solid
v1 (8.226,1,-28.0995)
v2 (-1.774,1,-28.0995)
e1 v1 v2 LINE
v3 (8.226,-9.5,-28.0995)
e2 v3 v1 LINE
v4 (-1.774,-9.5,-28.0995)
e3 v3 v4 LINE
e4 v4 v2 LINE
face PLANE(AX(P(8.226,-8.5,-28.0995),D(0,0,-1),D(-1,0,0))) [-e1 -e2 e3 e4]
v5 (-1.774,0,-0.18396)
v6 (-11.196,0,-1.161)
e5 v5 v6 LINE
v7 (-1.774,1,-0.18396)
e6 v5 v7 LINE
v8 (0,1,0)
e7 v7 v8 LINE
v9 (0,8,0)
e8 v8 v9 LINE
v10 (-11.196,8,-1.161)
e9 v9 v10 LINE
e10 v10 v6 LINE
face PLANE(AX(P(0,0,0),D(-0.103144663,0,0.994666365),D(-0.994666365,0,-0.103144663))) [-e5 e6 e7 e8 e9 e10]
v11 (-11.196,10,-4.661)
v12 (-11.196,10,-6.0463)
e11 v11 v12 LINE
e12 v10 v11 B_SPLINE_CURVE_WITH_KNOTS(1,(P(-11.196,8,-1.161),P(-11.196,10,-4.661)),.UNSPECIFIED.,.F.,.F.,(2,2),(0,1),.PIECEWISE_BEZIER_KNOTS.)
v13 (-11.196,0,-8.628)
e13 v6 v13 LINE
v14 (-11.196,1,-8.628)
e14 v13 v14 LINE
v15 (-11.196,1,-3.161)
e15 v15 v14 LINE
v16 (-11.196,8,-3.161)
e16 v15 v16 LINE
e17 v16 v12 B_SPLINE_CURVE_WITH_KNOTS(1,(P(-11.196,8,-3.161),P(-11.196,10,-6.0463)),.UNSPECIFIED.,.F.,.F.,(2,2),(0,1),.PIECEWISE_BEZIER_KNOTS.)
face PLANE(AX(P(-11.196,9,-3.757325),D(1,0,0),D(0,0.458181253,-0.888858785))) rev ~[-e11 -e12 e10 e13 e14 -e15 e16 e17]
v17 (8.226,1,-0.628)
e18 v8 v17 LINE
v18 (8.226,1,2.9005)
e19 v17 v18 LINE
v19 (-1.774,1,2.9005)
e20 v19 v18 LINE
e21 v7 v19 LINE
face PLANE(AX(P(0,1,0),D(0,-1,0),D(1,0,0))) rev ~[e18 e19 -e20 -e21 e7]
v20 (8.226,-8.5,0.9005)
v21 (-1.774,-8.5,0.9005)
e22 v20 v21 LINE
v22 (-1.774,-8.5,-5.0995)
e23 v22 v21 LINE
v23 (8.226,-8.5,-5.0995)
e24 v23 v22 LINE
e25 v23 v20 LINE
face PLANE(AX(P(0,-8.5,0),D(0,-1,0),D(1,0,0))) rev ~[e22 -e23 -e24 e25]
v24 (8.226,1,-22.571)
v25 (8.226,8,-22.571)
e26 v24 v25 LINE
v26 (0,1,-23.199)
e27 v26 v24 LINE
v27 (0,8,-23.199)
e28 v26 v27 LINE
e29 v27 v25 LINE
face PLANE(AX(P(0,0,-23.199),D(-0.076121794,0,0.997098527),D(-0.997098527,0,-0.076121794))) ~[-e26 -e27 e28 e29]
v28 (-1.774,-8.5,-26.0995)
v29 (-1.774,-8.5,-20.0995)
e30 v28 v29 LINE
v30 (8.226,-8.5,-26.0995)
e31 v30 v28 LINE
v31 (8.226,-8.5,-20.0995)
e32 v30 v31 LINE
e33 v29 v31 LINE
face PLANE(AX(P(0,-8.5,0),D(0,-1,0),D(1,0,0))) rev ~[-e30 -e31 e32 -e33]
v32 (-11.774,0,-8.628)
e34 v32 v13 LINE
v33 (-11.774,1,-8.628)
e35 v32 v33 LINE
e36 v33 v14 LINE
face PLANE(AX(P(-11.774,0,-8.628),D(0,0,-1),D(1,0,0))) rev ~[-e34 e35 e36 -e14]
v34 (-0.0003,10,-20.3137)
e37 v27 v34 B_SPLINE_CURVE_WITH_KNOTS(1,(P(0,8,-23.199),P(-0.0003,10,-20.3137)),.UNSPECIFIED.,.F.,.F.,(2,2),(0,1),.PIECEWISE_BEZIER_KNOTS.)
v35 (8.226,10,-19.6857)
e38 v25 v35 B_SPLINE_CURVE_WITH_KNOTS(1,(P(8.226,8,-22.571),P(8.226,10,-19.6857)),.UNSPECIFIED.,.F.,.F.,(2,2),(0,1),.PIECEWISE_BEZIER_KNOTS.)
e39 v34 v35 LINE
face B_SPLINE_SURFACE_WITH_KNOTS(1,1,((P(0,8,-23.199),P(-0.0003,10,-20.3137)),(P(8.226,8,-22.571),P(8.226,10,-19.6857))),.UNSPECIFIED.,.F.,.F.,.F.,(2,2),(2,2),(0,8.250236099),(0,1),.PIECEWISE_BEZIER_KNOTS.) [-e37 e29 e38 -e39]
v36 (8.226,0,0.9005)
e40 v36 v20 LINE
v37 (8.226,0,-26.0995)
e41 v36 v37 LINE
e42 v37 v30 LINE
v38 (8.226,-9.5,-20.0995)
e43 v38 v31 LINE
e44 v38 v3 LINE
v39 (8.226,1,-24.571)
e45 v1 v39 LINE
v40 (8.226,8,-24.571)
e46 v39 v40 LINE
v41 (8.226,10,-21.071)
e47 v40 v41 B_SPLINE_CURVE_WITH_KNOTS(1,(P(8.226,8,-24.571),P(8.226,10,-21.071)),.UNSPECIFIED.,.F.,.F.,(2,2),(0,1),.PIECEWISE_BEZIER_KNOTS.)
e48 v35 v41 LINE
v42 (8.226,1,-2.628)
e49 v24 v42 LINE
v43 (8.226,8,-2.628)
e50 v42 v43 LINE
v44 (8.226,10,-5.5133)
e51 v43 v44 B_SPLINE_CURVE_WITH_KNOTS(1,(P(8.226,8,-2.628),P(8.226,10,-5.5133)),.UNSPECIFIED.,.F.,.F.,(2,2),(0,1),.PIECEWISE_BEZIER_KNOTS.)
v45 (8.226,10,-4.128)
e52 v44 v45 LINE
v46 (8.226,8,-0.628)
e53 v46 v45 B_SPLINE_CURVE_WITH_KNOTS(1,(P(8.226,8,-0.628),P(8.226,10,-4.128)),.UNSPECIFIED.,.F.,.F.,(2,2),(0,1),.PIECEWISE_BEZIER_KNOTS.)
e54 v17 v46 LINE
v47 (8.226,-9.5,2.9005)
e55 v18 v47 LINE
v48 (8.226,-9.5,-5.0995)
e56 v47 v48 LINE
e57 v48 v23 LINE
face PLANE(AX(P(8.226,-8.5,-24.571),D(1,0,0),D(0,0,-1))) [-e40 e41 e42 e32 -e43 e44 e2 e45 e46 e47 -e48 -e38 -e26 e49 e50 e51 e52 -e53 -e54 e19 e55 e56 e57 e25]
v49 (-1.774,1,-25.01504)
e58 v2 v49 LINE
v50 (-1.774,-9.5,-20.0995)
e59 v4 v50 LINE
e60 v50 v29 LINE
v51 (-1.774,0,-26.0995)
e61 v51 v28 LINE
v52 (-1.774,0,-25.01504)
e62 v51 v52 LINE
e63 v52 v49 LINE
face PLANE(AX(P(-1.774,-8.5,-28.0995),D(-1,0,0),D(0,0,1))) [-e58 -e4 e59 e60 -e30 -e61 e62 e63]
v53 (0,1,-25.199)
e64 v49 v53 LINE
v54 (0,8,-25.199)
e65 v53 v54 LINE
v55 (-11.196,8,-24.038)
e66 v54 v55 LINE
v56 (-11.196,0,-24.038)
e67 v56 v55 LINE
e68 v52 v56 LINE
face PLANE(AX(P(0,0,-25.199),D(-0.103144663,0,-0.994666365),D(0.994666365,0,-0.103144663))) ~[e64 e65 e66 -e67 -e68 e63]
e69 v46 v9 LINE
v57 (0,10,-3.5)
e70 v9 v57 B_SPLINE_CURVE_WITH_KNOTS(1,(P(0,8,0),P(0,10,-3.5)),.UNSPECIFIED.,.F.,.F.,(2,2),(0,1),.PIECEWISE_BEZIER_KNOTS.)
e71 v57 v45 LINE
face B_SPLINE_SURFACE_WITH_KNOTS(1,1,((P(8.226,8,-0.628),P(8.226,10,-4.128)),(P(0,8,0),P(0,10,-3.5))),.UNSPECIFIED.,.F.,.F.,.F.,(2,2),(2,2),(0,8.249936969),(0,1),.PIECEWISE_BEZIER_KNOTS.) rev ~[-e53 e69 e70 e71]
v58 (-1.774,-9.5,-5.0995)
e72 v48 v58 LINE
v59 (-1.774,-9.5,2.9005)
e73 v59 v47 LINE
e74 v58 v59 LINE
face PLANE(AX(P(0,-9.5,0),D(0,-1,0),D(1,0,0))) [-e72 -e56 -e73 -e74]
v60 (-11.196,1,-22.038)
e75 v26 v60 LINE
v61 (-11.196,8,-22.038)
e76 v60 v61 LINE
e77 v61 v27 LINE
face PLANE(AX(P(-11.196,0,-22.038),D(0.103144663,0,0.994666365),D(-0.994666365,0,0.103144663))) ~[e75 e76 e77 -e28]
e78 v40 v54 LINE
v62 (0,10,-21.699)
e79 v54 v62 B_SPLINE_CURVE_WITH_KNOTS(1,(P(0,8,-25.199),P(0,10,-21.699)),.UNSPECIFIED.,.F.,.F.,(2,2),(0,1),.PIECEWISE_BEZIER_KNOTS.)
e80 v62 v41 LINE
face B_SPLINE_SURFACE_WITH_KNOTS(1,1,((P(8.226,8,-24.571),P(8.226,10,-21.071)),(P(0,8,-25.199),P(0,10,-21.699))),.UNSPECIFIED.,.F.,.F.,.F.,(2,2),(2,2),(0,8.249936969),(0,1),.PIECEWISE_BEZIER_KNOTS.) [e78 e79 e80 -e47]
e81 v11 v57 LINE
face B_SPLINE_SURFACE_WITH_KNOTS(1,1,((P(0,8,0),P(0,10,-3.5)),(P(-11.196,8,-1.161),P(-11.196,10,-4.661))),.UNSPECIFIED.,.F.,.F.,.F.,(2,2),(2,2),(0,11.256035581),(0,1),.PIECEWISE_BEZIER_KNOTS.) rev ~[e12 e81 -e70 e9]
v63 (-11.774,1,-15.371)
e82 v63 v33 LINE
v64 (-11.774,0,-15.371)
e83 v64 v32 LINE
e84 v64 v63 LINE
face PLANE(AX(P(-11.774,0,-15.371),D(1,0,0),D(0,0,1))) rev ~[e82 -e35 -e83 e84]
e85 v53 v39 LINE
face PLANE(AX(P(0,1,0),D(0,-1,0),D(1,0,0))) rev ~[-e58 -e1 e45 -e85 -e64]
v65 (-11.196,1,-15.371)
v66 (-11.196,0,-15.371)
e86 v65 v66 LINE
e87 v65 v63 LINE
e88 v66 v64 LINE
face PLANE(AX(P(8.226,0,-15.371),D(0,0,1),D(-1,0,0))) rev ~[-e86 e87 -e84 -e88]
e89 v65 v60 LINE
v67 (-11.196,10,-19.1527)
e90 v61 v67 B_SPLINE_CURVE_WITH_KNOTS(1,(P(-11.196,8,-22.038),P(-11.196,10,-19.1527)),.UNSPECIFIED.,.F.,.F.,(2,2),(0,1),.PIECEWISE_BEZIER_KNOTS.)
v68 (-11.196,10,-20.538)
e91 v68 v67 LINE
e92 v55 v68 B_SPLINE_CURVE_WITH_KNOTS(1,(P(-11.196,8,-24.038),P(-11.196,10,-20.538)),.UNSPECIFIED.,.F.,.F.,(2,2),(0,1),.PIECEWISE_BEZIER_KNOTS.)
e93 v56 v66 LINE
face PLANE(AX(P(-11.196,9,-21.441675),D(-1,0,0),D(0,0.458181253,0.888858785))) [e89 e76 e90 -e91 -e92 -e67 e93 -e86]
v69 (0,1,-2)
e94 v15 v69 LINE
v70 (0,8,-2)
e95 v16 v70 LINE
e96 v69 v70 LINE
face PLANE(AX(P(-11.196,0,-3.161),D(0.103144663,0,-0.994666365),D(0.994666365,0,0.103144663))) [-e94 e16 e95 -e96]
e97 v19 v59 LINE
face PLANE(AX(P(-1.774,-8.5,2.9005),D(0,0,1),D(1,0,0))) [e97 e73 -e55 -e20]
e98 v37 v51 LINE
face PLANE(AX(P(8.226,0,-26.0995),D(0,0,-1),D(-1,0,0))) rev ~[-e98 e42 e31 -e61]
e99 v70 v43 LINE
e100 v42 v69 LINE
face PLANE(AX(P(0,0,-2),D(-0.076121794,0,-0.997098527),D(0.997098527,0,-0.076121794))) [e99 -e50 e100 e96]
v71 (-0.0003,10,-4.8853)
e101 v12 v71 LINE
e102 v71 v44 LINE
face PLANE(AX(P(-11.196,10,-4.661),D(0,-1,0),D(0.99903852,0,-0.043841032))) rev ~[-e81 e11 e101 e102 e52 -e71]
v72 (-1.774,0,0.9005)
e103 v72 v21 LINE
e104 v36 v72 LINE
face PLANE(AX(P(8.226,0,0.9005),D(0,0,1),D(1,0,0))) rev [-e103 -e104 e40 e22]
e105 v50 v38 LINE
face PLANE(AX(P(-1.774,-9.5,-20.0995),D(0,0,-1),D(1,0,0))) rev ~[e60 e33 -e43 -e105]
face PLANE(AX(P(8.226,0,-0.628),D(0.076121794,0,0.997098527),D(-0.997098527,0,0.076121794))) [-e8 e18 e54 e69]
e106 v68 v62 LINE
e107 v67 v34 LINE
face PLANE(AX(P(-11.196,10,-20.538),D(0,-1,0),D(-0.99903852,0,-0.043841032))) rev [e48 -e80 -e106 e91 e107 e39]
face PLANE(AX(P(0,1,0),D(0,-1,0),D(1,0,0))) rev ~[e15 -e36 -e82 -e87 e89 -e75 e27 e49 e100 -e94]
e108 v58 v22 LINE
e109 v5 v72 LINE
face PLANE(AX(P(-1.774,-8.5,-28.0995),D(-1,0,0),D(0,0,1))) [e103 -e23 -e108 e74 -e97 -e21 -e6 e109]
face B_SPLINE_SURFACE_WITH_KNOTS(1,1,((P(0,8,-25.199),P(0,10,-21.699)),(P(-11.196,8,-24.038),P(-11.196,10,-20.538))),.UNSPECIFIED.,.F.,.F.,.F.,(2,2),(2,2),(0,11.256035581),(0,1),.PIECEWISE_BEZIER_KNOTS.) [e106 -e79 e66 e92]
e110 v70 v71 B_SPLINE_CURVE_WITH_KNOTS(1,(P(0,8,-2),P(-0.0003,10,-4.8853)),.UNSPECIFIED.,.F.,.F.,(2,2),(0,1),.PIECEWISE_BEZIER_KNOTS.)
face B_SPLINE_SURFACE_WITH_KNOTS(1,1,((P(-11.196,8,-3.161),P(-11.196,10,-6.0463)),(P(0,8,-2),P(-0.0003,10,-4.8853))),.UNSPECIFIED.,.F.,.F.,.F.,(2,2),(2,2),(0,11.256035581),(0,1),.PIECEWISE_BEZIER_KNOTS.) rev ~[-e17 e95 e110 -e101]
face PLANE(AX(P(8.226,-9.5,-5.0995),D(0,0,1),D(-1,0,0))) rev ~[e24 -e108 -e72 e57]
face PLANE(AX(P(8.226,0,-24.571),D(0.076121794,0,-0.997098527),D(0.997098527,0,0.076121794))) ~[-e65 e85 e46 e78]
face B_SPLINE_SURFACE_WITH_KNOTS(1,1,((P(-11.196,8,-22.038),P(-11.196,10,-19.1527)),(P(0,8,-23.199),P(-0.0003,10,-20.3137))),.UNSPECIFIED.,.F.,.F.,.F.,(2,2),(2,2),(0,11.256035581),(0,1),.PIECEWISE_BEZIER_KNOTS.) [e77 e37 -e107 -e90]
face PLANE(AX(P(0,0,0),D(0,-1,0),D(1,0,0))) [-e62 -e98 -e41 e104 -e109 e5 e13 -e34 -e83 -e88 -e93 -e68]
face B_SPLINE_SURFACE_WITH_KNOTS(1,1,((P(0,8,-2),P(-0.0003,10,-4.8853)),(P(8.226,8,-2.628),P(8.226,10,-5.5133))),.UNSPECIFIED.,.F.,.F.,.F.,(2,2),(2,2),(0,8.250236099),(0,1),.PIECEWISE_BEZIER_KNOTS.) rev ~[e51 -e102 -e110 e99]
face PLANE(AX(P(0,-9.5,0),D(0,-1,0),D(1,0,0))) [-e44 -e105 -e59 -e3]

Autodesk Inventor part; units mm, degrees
ref_plane "YZ Plane" through (0, 0, 0) normal (1, 0, 0) x (0, 1, 0)
ref_plane "XZ Plane" through (0, 0, 0) normal (0, 1, 0) x (-1, 0, 0)
ref_plane "XY Plane" through (0, 0, 0) normal (0, 0, 1) x (1, 0, 0)
sketch "Esquisse3" plane through (0, 0, 0) normal (0, 1, 0) x (-1, 0, 0)
  line L0 (0, 0) -> (11.196, -1.161)
  line L1 (11.196, -1.161) -> (11.196, -3.161)
  line L2 (11.196, -3.161) -> (0, -2)
  line L3 (0, -2) -> (-8.226, -2.628)
  line L4 (-8.226, -2.628) -> (-8.226, -0.628)
  line L5 (-8.226, -0.628) -> (0, 0)
  line L6 (0, 0) -> (0, -2) construction
  dimension "d10" = 0.628
  dimension "d11" = 1.161
  dimension "d12" = 11.256
  dimension "d13" = 8.226
  dimension "d14" = 2
extrude "Extrusion1" add sketch "Esquisse3" along normal blind 8
ref_plane "Plan de construction1" through (0, 10, 0) normal (0, 1, 0) x (1, 0, 0)
sketch "Esquisse4" plane through (0, 10, 0) normal (0, 1, 0) x (1, 0, 0)
  line L0 (8.226, 0.628) -> (8.226, 2.628) construction
  line L1 (8.226, 2.628) -> (0, 2) construction
  line L2 (8.226, 2.628) -> (0, 2) construction
  line L3 (0, 2) -> (-11.196, 3.161) construction
  line L4 (0, 2) -> (-11.196, 3.161) construction
  line L5 (-11.196, 3.161) -> (-11.196, 4.661) construction
  line L6 (-11.196, 4.661) -> (0, 3.5)
  line L7 (0, 3.5) -> (8.226, 4.128)
  line L8 (8.226, 2.628) -> (8.226, 4.128) construction
  line L9 (0, 2) -> (0, 3.5) construction
  line L10 (-11.196, 4.661) -> (-11.196, 6.0463)
  line L11 (-11.196, 6.0463) -> (-0.0003, 4.8853)
  line L12 (-0.0003, 4.8853) -> (8.226, 5.5133)
  line L13 (8.226, 5.5133) -> (8.226, 4.128)
  point P0 (0, 0)
  dimension "d18" = 1.5
  dimension "d19" = 1.5
  dimension "d20" = 1.5
loft "Lissage1" add profiles "Esquisse4" section 1 edges at (-5.598, 8, -0.5805) (4.113, 8, -0.314) (8.226, 8, -1.628) (4.113, 8, -2.314) (-5.598, 8, -2.5805) (-11.196, 8, -2.161)
sketch "Esquisse9" plane through (0, 0, 0) normal (0, -1, 0) x (1, 0, 0)
  line L0 (8.226, -0.628) -> (0, 0) projected
  line L1 (8.226, -0.628) -> (0, 0)
  line L2 (0, 0) -> (-11.196, -1.161) projected
  line L3 (0, 0) -> (-11.196, -1.161)
  line L4 (-11.196, -1.161) -> (-11.196, -22.84)
  line L5 (-11.196, -22.84) -> (0, -24)
  line L6 (0, -24) -> (8.226, -23.371)
  line L7 (8.226, -0.628) -> (8.226, -2.628) projected
  line L8 (8.226, -23.371) -> (8.226, -0.628)
  line L9 (0, 0) -> (0, -24) construction
  dimension "d29" = 24
  dimension "d30" = 22.743
  dimension "d31" = 21.679
extrude "Extrusion2" add sketch "Esquisse9" against normal blind 1
sketch "Esquisse10" plane through (0, 0, 0) normal (0, -1, 0) x (1, 0, 0)
  line L0 (8.226, -15.371) -> (-11.774, -15.371)
  line L1 (-11.774, -15.371) -> (-11.774, -8.628)
  line L2 (-11.774, -8.628) -> (8.226, -8.628)
  line L3 (8.226, -8.628) -> (8.226, -15.371)
  point P0 (8.226, -23.371)
  point P1 (8.226, -0.628)
  dimension "d34" = 8
  dimension "d35" = 8
  dimension "d36" = 20
extrude "Extrusion3" add sketch "Esquisse10" against normal blind 1
ref_plane "Plan de construction3" through (-11.196, 0, -12.5995) normal (0, 0, -1) x (-1, 0, 0)
mirror "Symétrie2" about plane through (-11.196, 0, -12.5995) normal (0, 0, -1) of "Extrusion1", "Lissage1"
sketch "Esquisse11" plane through (0, 0, 0) normal (0, -1, 0) x (1, 0, 0)
  line L0 (8.226, -28.0995) -> (-1.774, -28.0995)
  line L1 (-1.774, -28.0995) -> (-1.774, 2.9005)
  line L2 (-1.774, 2.9005) -> (8.226, 2.9005)
  line L3 (8.226, 2.9005) -> (8.226, -28.0995) construction
  line L4 (8.226, -28.0995) -> (8.226, -24.571)
  line L5 (8.226, -24.571) -> (8.226, -0.628) projected
  line L6 (8.226, -0.628) -> (8.226, 2.9005)
  point P0 (0, 0)
  dimension "d40" = 31
  dimension "d41" = 10
extrude "Extrusion4" add sketch "Esquisse11" against normal blind 1
sketch "Esquisse12" plane through (0, 0, 0) normal (0, -1, 0) x (1, 0, 0)
  line L0 (8.226, -28.0995) -> (-1.774, -28.0995) projected
  line L1 (8.226, -28.0995) -> (-1.774, -28.0995)
  line L2 (-1.774, -28.0995) -> (-1.774, -26.0995)
  line L3 (-1.774, -28.0995) -> (-1.774, -25.015) construction
  line L4 (8.226, -24.571) -> (8.226, -28.0995) construction
  line L5 (8.226, -26.0995) -> (-1.774, -26.0995)
  line L6 (8.226, -28.0995) -> (8.226, -26.0995)
  point P0 (0, 0)
  dimension "d44" = 2
extrude "Extrusion5" add sketch "Esquisse12" along normal blind 8.5
mirror "Symétrie3" about plane through (-11.196, 0, -12.5995) normal (0, 0, -1) of "Extrusion5"
sketch "Esquisse13" plane through (0, -8.5, 0) normal (0, -1, 0) x (1, 0, 0)
  line L0 (8.226, -24.571) -> (8.226, -28.0995) projected
  line L1 (-1.774, 2.9005) -> (8.226, 2.9005) projected
  line L2 (8.226, -28.0995) -> (-1.774, -28.0995)
  line L3 (-1.774, -28.0995) -> (-1.774, 2.9005)
  line L4 (-1.774, 2.9005) -> (8.226, 2.9005)
  line L5 (8.226, 2.9005) -> (8.226, -28.0995)
  point P0 (0, 0)
extrude "Extrusion6" add sketch "Esquisse13" along normal blind 1
sketch "Esquisse14" plane through (0, -9.5, 0) normal (0, -1, 0) x (1, 0, 0)
  line L0 (-1.774, -26.0995) -> (-1.774, 0.9005) construction
  line L1 (8.226, 0.9005) -> (8.226, -26.0995) construction
  line L2 (-1.774, -20.0995) -> (8.226, -20.0995)
  line L3 (8.226, -20.0995) -> (8.226, -5.0995)
  line L4 (8.226, -5.0995) -> (-1.774, -5.0995)
  line L5 (-1.774, -5.0995) -> (-1.774, -20.0995)
  line L6 (-1.774, -28.0995) -> (8.226, -28.0995) construction
  line L7 (8.226, 2.9005) -> (-1.774, 2.9005) construction
  line L8 (-1.774, -20.0995) -> (-1.774, -5.0995)
  line L9 (8.226, -5.0995) -> (8.226, -20.0995)
  point P0 (0, 0)
  dimension "d49" = 8
  dimension "d50" = 8
extrude "Extrusion7" cut sketch "Esquisse14" against normal blind 1
properties part number "ESCFixation"
